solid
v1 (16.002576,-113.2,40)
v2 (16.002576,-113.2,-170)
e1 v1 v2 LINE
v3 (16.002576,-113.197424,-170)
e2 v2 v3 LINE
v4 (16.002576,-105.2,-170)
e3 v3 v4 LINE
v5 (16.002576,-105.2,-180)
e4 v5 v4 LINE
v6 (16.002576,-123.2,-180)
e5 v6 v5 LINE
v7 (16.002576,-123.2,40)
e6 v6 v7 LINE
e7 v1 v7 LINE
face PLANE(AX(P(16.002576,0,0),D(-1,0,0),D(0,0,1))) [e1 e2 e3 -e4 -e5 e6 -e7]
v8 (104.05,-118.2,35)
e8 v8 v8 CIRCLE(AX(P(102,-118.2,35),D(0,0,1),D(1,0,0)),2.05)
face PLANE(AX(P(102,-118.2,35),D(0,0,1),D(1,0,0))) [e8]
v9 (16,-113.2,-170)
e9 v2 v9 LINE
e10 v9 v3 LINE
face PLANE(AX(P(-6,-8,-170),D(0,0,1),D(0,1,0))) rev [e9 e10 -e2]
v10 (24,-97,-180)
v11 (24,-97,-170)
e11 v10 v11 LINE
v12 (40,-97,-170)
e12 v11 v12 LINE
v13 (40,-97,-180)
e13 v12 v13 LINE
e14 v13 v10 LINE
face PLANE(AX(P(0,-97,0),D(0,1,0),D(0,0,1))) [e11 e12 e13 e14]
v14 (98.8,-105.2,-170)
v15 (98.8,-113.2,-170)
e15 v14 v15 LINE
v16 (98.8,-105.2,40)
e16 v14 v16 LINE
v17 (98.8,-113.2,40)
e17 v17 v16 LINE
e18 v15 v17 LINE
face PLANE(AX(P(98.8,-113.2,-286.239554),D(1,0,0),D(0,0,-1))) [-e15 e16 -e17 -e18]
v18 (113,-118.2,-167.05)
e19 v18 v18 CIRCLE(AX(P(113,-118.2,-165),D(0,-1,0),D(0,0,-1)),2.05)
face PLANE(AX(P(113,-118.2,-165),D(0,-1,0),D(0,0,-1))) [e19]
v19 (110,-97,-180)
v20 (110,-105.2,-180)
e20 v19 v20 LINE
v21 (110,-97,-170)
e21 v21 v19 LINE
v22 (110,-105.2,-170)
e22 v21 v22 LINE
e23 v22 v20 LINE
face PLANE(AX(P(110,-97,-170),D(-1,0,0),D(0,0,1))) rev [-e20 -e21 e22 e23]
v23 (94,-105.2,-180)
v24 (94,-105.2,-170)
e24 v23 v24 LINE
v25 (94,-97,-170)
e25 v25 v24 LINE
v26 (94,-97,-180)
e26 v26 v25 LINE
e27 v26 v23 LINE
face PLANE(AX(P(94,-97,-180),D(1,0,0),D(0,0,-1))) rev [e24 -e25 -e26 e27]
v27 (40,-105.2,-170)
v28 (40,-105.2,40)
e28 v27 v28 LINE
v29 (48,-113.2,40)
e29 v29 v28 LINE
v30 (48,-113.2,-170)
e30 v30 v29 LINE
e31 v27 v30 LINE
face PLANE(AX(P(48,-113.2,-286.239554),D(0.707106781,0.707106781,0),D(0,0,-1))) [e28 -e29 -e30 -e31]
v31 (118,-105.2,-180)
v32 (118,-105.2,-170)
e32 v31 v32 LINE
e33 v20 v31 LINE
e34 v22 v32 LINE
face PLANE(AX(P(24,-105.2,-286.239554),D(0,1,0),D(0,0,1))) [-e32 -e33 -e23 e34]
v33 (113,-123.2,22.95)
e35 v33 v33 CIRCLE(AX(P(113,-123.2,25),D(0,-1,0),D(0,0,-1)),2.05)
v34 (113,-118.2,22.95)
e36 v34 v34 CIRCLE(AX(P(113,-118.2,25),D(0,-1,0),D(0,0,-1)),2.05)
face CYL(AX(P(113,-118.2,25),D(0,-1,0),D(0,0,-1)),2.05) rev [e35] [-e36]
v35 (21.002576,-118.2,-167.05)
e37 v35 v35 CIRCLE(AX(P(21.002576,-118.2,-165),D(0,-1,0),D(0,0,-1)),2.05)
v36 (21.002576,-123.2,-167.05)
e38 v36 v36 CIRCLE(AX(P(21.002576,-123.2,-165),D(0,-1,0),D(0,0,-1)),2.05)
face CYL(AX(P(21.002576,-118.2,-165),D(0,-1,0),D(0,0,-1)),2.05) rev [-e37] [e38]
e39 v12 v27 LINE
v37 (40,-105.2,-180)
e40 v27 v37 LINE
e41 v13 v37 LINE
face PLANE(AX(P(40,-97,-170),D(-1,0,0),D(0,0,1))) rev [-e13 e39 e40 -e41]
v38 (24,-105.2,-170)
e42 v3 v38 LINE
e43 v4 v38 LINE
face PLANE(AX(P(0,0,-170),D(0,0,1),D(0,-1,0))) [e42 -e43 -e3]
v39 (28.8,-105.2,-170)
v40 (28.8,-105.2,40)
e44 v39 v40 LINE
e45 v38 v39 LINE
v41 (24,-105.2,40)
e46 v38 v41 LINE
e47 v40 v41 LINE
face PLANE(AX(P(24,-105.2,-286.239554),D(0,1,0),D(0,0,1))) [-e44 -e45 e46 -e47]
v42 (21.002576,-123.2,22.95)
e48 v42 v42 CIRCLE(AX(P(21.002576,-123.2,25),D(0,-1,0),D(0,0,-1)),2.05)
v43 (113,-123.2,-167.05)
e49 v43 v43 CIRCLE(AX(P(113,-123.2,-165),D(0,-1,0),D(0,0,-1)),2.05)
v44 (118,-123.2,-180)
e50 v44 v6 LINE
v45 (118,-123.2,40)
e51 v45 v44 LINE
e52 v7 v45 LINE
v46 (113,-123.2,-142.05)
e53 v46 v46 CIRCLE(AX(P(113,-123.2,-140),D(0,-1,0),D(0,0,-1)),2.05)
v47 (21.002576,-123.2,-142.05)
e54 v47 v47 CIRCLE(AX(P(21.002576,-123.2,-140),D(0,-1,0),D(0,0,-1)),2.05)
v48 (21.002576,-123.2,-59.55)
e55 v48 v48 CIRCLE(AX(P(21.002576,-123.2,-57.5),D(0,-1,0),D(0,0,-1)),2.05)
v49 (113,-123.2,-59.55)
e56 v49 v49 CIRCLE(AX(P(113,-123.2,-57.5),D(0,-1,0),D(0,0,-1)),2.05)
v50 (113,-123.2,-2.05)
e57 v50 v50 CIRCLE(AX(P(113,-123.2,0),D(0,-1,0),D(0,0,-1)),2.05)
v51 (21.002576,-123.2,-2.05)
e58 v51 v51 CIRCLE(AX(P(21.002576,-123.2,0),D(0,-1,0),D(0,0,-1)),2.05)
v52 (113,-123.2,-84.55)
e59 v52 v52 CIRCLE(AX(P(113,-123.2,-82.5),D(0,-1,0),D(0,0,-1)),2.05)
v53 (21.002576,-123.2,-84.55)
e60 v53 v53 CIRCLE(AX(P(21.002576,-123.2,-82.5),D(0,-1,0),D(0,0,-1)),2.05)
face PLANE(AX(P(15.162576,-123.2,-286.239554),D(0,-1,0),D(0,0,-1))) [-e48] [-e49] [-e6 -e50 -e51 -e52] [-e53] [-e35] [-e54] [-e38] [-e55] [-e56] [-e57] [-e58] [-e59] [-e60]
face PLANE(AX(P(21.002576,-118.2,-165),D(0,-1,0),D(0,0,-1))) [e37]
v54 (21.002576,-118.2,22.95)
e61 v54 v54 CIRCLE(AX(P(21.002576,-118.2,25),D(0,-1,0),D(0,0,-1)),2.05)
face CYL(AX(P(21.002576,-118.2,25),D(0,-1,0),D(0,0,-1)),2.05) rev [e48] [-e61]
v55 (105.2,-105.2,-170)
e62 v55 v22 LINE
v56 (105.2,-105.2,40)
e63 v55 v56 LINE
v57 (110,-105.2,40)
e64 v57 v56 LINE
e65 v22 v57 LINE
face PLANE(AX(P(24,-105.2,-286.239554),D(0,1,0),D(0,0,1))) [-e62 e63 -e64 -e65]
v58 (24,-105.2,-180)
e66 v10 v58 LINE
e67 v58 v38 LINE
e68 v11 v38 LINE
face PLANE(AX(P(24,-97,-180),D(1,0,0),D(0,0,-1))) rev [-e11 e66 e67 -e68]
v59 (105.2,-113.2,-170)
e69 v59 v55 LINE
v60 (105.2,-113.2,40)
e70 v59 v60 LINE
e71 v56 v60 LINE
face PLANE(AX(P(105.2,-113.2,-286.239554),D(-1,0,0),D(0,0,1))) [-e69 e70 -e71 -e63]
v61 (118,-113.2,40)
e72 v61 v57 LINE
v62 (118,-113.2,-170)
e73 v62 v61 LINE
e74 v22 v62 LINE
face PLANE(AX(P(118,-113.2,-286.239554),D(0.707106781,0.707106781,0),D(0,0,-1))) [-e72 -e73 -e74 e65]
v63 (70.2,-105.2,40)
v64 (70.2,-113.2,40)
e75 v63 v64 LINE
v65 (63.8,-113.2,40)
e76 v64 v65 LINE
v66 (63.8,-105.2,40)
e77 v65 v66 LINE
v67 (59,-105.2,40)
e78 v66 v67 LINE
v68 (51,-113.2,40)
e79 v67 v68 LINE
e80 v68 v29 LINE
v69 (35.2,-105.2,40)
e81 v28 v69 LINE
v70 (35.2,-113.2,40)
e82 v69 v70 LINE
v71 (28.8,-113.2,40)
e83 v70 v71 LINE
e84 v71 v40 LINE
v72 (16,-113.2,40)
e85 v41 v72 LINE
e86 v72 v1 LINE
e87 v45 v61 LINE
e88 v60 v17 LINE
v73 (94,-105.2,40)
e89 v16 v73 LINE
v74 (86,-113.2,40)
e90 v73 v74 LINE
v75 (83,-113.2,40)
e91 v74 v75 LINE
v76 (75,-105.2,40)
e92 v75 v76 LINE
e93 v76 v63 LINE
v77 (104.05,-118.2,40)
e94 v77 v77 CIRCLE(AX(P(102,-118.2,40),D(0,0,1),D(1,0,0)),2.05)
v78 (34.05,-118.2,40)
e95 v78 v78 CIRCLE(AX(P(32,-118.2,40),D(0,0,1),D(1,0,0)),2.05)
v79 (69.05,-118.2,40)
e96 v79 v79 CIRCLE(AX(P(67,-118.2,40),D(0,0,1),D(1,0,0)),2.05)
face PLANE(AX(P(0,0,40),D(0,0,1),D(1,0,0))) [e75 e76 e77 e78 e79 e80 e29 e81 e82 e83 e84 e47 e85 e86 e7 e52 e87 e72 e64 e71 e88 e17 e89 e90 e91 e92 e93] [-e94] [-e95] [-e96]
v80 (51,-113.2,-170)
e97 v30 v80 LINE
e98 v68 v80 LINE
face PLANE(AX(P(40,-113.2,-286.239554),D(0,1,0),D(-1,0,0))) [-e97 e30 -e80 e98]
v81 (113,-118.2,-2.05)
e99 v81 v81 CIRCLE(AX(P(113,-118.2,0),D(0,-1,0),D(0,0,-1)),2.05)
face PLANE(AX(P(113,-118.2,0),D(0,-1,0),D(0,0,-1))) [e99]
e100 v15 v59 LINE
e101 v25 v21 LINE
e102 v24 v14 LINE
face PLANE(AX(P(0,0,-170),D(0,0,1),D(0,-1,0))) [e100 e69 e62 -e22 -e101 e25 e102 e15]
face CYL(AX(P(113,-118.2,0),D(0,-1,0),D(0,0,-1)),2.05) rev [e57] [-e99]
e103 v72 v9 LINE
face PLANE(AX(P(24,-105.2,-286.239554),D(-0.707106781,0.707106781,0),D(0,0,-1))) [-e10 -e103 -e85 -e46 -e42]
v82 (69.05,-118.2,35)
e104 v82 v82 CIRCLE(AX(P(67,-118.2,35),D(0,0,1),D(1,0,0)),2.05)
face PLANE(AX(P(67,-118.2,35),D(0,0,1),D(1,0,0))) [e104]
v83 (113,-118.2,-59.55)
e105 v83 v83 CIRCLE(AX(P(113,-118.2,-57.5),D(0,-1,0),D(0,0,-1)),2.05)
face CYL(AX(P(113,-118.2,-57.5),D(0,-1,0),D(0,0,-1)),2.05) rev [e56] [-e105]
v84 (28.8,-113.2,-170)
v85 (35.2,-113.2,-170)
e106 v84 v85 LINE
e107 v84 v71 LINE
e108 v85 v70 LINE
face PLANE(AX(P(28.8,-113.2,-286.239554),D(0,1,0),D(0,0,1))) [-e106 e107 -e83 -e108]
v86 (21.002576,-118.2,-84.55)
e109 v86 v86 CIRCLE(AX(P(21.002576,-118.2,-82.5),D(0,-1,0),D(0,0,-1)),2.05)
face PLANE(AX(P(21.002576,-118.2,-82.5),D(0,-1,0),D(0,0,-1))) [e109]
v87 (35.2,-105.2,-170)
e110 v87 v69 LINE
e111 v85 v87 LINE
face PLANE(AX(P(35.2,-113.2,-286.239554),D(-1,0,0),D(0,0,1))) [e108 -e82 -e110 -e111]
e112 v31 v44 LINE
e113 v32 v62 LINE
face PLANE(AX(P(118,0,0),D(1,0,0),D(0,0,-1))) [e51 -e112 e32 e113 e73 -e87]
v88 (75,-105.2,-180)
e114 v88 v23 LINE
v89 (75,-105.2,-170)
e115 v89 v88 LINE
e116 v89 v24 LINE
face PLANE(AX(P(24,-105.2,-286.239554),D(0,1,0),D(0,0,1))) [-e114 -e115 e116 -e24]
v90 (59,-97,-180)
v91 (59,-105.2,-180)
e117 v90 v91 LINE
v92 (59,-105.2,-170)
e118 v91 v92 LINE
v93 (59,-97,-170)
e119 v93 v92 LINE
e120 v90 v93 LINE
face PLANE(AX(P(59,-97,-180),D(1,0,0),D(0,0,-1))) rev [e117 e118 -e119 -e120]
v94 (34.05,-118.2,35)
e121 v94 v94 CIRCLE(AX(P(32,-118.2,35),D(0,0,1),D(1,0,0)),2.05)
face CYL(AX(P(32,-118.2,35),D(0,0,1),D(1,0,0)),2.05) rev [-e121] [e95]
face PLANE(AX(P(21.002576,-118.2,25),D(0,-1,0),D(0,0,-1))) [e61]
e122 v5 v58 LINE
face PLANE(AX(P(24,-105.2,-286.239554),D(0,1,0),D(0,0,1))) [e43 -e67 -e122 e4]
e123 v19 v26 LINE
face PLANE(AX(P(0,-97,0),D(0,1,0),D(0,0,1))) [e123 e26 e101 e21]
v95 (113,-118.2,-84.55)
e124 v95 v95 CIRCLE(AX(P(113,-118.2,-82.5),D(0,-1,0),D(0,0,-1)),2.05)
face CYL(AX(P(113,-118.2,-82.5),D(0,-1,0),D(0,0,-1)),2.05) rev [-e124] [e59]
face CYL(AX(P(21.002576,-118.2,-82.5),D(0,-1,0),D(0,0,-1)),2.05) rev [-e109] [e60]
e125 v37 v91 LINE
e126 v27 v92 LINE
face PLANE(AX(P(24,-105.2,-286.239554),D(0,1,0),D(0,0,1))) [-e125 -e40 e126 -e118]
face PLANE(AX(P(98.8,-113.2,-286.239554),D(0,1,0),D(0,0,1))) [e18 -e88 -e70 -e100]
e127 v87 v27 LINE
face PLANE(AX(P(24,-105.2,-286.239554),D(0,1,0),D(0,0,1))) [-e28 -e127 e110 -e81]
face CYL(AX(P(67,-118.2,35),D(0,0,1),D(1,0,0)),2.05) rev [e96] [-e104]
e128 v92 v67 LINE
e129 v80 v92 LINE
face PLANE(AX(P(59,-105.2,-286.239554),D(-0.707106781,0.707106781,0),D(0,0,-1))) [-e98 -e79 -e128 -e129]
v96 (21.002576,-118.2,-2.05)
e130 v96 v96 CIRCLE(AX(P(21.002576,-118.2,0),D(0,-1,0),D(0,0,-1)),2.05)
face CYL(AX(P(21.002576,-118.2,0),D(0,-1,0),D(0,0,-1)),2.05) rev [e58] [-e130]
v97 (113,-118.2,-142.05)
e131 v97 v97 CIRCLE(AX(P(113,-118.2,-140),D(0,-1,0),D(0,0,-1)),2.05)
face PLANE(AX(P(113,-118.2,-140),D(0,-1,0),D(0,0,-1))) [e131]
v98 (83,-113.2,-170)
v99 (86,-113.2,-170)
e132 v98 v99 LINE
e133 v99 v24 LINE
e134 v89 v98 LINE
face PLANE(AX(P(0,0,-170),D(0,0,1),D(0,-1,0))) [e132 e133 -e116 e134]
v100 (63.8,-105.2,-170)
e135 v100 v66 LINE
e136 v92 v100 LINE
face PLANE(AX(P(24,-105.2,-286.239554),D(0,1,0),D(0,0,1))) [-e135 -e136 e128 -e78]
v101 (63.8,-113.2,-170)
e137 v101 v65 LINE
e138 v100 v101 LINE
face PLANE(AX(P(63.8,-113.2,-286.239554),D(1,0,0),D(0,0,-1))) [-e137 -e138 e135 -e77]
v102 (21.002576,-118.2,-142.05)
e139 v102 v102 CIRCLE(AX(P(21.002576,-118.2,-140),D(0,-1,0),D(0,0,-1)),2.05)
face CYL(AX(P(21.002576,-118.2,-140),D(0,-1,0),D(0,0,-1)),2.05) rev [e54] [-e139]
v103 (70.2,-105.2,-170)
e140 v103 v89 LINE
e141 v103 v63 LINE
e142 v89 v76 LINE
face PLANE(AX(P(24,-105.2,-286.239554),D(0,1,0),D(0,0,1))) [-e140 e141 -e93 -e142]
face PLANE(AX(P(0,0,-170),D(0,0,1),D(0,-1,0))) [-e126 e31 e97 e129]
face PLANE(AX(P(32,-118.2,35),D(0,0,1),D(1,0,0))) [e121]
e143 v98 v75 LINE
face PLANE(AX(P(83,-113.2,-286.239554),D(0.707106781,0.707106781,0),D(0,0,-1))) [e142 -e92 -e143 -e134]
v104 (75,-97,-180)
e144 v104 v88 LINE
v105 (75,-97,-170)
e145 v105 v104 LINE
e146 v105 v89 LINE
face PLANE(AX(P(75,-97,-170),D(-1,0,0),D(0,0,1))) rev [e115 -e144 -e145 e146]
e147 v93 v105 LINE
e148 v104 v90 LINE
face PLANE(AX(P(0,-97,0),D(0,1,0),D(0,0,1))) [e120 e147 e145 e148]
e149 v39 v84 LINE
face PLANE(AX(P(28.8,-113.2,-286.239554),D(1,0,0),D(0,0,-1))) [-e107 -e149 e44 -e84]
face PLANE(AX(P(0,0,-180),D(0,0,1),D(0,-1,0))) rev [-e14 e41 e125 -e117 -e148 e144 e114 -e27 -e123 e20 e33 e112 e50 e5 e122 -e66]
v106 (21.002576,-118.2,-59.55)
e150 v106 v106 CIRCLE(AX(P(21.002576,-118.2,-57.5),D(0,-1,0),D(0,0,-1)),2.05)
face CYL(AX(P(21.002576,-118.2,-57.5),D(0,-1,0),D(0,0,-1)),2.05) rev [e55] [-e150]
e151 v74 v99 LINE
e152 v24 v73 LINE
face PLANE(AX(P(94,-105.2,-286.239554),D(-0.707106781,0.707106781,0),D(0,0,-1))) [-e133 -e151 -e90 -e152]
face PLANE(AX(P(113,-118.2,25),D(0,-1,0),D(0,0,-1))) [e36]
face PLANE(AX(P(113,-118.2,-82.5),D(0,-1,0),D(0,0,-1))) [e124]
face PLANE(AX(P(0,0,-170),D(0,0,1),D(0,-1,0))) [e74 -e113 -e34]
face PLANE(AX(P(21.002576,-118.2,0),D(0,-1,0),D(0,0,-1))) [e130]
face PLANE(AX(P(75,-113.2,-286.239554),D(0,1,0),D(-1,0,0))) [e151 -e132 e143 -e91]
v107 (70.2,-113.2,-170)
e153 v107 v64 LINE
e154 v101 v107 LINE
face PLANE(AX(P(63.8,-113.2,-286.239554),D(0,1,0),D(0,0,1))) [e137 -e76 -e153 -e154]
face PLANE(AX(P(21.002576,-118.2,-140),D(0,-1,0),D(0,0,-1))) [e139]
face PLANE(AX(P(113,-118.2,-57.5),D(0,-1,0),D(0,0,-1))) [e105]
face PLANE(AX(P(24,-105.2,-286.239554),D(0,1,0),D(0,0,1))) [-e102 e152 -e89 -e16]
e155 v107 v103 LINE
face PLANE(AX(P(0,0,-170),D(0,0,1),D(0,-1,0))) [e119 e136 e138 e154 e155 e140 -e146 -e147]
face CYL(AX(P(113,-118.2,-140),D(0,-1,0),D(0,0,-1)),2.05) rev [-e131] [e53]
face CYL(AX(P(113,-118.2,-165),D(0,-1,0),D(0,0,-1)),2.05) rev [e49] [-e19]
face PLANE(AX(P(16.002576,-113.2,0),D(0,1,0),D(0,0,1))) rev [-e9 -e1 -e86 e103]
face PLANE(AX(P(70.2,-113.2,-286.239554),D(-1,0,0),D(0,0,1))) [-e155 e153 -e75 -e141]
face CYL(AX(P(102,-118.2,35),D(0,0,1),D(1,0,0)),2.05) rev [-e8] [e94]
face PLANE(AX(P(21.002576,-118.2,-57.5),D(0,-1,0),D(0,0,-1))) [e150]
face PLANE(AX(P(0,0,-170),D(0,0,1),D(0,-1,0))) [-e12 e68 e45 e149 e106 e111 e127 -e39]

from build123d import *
from build123d.topology import SkipClean

# Parameters (mm, degrees)
EXTRUDE_1_DEPTH     = 170
CHAMFER_1_SIZE      = 8
SKETCH_2_W          = 170
SKETCH_2_H          = 10
CUT_EXTRUDE_1_DEPTH = 0.84
EXTRUDE_2_DEPTH     = 80
SKETCH_4_W          = 250
SKETCH_4_H          = 10
CUT_EXTRUDE_2_DEPTH = 12
SKETCH_5_W          = 101.997424074
SKETCH_5_H          = 18
EXTRUDE_3_DEPTH     = 10
SKETCH_6_R          = 2.05
CUT_EXTRUDE_3_DEPTH = 5
SKETCH_7_W          = 16
SKETCH_7_H          = 10
EXTRUDE_4_DEPTH     = 8.2
CUT_EXTRUDE_5_DEPTH = 40
SKETCH_11_R         = 2.05
CUT_EXTRUDE_6_DEPTH = 5


with BuildPart() as part:
    # 草图1 → 凸台-拉伸1 (new body)
    with BuildSketch(Plane.XY):
        Polygon((28.8, -113.2), (35.2, -113.2), (35.2, -105.2), (40, -105.2), (40, -113.2), (59, -113.2), (59, -105.2), (63.8, -105.2), (63.8, -113.2), (70.2, -113.2), (70.2, -105.2), (75, -105.2), (75, -113.2), (94, -113.2), (94, -105.2), (98.8, -105.2), (98.8, -113.2), (105.2, -113.2), (105.2, -105.2), (110, -105.2), (110, -113.2), (130, -113.2), (130, -123.2), (15.162575926, -123.2), (15.162575926, -113.2), (24, -113.2), (24, -105.2), (28.8, -105.2), align=None)
    extrude(amount=-EXTRUDE_1_DEPTH)

    # 倒角1
    chamfer_1_edges = [part.edges().sort_by_distance(p)[0] for p in [
        (24, -113.2, -85),
        (110, -113.2, -85),
        (94, -113.2, -85),
        (75, -113.2, -85),
        (59, -113.2, -85),
        (40, -113.2, -85),
    ]]
    chamfer(chamfer_1_edges, length=CHAMFER_1_SIZE - 0.0001)  # a hair under: the kernel refuses the full size

    # 草图2 → 切除-拉伸1 (cut)
    with BuildSketch(Plane.ZY.offset(-15.162575926)):
        with Locations((-85, -118.2)):
            Rectangle(SKETCH_2_W, SKETCH_2_H)
    extrude(amount=-CUT_EXTRUDE_1_DEPTH, mode=Mode.SUBTRACT)

    # 草图3 → 凸台-拉伸2 (add)
    with SkipClean():  # the faces are left unmerged after this step: merging them gives an invalid solid
        with BuildSketch(Plane.XY):
            Polygon((24, -105.2), (16, -113.2), (16.002575926, -113.2), (16.002575926, -123.2), (130, -123.2), (130, -113.2), (118, -113.2), (110, -105.2), (105.2, -105.2), (105.2, -113.2), (98.8, -113.2), (98.8, -105.2), (94, -105.2), (86, -113.2), (83, -113.2), (75, -105.2), (70.2, -105.2), (70.2, -113.2), (63.8, -113.2), (63.8, -105.2), (59, -105.2), (51, -113.2), (48, -113.2), (40, -105.2), (35.2, -105.2), (35.2, -113.2), (28.8, -113.2), (28.8, -105.2), align=None)
        extrude(amount=EXTRUDE_2_DEPTH)

    # 草图4 → 切除-拉伸2 (cut)
    with SkipClean():  # the faces are left unmerged after this step: merging them gives an invalid solid
        with BuildSketch(Plane(origin=(130, 0, 0), x_dir=(0, 0, -1), z_dir=(1, 0, 0))):
            with Locations((45, -118.2)):
                Rectangle(SKETCH_4_W, SKETCH_4_H)
        extrude(amount=-CUT_EXTRUDE_2_DEPTH, mode=Mode.SUBTRACT)

    # 草图5 → 凸台-拉伸3 (add)
    with SkipClean():  # the faces are left unmerged after this step: merging them gives an invalid solid
        with BuildSketch(Plane(origin=(0, 0, -170), x_dir=(-1, 0, 0), z_dir=(0, 0, -1))):
            with Locations((-67.001287963, -114.2)):
                Rectangle(SKETCH_5_W, SKETCH_5_H)
        extrude(amount=EXTRUDE_3_DEPTH)

    # 草图6 → 切除-拉伸3 (cut)
    with SkipClean():  # the faces are left unmerged after this step: merging them gives an invalid solid
        with BuildSketch(Plane.XZ.offset(123.2)):
            with Locations(Location((21.002575926, 25, 0), (0, 0, 270))):
                Circle(SKETCH_6_R)
            with Locations(Location((21.002575926, 0, 0), (0, 0, 270))):
                Circle(SKETCH_6_R)
            with Locations(Location((21.002575926, -57.5, 0), (0, 0, 270))):
                Circle(SKETCH_6_R)
            with Locations(Location((21.002575926, -82.5, 0), (0, 0, 270))):
                Circle(SKETCH_6_R)
            with Locations(Location((21.002575926, -140, 0), (0, 0, 270))):
                Circle(SKETCH_6_R)
            with Locations(Location((21.002575926, -165, 0), (0, 0, 270))):
                Circle(SKETCH_6_R)
            with Locations(Location((113, -140, 0), (0, 0, 270))):
                Circle(SKETCH_6_R)
            with Locations(Location((113, -82.5, 0), (0, 0, 270))):
                Circle(SKETCH_6_R)
            with Locations(Location((113, -57.5, 0), (0, 0, 270))):
                Circle(SKETCH_6_R)
            with Locations(Location((113, 0, 0), (0, 0, 270))):
                Circle(SKETCH_6_R)
            with Locations(Location((113, 25, 0), (0, 0, 270))):
                Circle(SKETCH_6_R)
            with Locations(Location((113, -165, 0), (0, 0, 270))):
                Circle(SKETCH_6_R)
        extrude(amount=-CUT_EXTRUDE_3_DEPTH, mode=Mode.SUBTRACT)

    # 草图7 → 凸台-拉伸4 (add)
    with SkipClean():  # the faces are left unmerged after this step: merging them gives an invalid solid
        with BuildSketch(Plane(origin=(0, -105.2, 0), x_dir=(1, 0, 0), z_dir=(0, 1, 0))):
            with Locations((102, 175)):
                Rectangle(SKETCH_7_W, SKETCH_7_H)
            with Locations((67, 175)):
                Rectangle(SKETCH_7_W, SKETCH_7_H)
            with Locations((32, 175)):
                Rectangle(SKETCH_7_W, SKETCH_7_H)
        extrude(amount=EXTRUDE_4_DEPTH)

    # 草图10 → 切除-拉伸5 (cut)
    with SkipClean():  # the faces are left unmerged after this step: merging them gives an invalid solid
        with BuildSketch(Plane.XY.offset(80)):
            Polygon((16.002575926, -123.2), (118, -123.2), (118, -113.2), (110, -105.2), (105.2, -105.2), (105.2, -113.2), (98.8, -113.2), (98.8, -105.2), (94, -105.2), (86, -113.2), (83, -113.2), (75, -105.2), (70.2, -105.2), (70.2, -113.2), (63.8, -113.2), (63.8, -105.2), (59, -105.2), (51, -113.2), (48, -113.2), (40, -105.2), (35.2, -105.2), (35.2, -113.2), (28.8, -113.2), (28.8, -105.2), (24, -105.2), (16, -113.2), (16.002575926, -113.2), align=None)
        extrude(amount=-CUT_EXTRUDE_5_DEPTH, mode=Mode.SUBTRACT)

    # 草图11 → 切除-拉伸6 (cut)
    with SkipClean():  # the faces are left unmerged after this step: merging them gives an invalid solid
        with BuildSketch(Plane.XY.offset(40)):
            with Locations((32, -118.2)):
                Circle(SKETCH_11_R)
            with Locations((67, -118.2)):
                Circle(SKETCH_11_R)
            with Locations((102, -118.2)):
                Circle(SKETCH_11_R)
        extrude(amount=-CUT_EXTRUDE_6_DEPTH, mode=Mode.SUBTRACT)


solid = part.part
